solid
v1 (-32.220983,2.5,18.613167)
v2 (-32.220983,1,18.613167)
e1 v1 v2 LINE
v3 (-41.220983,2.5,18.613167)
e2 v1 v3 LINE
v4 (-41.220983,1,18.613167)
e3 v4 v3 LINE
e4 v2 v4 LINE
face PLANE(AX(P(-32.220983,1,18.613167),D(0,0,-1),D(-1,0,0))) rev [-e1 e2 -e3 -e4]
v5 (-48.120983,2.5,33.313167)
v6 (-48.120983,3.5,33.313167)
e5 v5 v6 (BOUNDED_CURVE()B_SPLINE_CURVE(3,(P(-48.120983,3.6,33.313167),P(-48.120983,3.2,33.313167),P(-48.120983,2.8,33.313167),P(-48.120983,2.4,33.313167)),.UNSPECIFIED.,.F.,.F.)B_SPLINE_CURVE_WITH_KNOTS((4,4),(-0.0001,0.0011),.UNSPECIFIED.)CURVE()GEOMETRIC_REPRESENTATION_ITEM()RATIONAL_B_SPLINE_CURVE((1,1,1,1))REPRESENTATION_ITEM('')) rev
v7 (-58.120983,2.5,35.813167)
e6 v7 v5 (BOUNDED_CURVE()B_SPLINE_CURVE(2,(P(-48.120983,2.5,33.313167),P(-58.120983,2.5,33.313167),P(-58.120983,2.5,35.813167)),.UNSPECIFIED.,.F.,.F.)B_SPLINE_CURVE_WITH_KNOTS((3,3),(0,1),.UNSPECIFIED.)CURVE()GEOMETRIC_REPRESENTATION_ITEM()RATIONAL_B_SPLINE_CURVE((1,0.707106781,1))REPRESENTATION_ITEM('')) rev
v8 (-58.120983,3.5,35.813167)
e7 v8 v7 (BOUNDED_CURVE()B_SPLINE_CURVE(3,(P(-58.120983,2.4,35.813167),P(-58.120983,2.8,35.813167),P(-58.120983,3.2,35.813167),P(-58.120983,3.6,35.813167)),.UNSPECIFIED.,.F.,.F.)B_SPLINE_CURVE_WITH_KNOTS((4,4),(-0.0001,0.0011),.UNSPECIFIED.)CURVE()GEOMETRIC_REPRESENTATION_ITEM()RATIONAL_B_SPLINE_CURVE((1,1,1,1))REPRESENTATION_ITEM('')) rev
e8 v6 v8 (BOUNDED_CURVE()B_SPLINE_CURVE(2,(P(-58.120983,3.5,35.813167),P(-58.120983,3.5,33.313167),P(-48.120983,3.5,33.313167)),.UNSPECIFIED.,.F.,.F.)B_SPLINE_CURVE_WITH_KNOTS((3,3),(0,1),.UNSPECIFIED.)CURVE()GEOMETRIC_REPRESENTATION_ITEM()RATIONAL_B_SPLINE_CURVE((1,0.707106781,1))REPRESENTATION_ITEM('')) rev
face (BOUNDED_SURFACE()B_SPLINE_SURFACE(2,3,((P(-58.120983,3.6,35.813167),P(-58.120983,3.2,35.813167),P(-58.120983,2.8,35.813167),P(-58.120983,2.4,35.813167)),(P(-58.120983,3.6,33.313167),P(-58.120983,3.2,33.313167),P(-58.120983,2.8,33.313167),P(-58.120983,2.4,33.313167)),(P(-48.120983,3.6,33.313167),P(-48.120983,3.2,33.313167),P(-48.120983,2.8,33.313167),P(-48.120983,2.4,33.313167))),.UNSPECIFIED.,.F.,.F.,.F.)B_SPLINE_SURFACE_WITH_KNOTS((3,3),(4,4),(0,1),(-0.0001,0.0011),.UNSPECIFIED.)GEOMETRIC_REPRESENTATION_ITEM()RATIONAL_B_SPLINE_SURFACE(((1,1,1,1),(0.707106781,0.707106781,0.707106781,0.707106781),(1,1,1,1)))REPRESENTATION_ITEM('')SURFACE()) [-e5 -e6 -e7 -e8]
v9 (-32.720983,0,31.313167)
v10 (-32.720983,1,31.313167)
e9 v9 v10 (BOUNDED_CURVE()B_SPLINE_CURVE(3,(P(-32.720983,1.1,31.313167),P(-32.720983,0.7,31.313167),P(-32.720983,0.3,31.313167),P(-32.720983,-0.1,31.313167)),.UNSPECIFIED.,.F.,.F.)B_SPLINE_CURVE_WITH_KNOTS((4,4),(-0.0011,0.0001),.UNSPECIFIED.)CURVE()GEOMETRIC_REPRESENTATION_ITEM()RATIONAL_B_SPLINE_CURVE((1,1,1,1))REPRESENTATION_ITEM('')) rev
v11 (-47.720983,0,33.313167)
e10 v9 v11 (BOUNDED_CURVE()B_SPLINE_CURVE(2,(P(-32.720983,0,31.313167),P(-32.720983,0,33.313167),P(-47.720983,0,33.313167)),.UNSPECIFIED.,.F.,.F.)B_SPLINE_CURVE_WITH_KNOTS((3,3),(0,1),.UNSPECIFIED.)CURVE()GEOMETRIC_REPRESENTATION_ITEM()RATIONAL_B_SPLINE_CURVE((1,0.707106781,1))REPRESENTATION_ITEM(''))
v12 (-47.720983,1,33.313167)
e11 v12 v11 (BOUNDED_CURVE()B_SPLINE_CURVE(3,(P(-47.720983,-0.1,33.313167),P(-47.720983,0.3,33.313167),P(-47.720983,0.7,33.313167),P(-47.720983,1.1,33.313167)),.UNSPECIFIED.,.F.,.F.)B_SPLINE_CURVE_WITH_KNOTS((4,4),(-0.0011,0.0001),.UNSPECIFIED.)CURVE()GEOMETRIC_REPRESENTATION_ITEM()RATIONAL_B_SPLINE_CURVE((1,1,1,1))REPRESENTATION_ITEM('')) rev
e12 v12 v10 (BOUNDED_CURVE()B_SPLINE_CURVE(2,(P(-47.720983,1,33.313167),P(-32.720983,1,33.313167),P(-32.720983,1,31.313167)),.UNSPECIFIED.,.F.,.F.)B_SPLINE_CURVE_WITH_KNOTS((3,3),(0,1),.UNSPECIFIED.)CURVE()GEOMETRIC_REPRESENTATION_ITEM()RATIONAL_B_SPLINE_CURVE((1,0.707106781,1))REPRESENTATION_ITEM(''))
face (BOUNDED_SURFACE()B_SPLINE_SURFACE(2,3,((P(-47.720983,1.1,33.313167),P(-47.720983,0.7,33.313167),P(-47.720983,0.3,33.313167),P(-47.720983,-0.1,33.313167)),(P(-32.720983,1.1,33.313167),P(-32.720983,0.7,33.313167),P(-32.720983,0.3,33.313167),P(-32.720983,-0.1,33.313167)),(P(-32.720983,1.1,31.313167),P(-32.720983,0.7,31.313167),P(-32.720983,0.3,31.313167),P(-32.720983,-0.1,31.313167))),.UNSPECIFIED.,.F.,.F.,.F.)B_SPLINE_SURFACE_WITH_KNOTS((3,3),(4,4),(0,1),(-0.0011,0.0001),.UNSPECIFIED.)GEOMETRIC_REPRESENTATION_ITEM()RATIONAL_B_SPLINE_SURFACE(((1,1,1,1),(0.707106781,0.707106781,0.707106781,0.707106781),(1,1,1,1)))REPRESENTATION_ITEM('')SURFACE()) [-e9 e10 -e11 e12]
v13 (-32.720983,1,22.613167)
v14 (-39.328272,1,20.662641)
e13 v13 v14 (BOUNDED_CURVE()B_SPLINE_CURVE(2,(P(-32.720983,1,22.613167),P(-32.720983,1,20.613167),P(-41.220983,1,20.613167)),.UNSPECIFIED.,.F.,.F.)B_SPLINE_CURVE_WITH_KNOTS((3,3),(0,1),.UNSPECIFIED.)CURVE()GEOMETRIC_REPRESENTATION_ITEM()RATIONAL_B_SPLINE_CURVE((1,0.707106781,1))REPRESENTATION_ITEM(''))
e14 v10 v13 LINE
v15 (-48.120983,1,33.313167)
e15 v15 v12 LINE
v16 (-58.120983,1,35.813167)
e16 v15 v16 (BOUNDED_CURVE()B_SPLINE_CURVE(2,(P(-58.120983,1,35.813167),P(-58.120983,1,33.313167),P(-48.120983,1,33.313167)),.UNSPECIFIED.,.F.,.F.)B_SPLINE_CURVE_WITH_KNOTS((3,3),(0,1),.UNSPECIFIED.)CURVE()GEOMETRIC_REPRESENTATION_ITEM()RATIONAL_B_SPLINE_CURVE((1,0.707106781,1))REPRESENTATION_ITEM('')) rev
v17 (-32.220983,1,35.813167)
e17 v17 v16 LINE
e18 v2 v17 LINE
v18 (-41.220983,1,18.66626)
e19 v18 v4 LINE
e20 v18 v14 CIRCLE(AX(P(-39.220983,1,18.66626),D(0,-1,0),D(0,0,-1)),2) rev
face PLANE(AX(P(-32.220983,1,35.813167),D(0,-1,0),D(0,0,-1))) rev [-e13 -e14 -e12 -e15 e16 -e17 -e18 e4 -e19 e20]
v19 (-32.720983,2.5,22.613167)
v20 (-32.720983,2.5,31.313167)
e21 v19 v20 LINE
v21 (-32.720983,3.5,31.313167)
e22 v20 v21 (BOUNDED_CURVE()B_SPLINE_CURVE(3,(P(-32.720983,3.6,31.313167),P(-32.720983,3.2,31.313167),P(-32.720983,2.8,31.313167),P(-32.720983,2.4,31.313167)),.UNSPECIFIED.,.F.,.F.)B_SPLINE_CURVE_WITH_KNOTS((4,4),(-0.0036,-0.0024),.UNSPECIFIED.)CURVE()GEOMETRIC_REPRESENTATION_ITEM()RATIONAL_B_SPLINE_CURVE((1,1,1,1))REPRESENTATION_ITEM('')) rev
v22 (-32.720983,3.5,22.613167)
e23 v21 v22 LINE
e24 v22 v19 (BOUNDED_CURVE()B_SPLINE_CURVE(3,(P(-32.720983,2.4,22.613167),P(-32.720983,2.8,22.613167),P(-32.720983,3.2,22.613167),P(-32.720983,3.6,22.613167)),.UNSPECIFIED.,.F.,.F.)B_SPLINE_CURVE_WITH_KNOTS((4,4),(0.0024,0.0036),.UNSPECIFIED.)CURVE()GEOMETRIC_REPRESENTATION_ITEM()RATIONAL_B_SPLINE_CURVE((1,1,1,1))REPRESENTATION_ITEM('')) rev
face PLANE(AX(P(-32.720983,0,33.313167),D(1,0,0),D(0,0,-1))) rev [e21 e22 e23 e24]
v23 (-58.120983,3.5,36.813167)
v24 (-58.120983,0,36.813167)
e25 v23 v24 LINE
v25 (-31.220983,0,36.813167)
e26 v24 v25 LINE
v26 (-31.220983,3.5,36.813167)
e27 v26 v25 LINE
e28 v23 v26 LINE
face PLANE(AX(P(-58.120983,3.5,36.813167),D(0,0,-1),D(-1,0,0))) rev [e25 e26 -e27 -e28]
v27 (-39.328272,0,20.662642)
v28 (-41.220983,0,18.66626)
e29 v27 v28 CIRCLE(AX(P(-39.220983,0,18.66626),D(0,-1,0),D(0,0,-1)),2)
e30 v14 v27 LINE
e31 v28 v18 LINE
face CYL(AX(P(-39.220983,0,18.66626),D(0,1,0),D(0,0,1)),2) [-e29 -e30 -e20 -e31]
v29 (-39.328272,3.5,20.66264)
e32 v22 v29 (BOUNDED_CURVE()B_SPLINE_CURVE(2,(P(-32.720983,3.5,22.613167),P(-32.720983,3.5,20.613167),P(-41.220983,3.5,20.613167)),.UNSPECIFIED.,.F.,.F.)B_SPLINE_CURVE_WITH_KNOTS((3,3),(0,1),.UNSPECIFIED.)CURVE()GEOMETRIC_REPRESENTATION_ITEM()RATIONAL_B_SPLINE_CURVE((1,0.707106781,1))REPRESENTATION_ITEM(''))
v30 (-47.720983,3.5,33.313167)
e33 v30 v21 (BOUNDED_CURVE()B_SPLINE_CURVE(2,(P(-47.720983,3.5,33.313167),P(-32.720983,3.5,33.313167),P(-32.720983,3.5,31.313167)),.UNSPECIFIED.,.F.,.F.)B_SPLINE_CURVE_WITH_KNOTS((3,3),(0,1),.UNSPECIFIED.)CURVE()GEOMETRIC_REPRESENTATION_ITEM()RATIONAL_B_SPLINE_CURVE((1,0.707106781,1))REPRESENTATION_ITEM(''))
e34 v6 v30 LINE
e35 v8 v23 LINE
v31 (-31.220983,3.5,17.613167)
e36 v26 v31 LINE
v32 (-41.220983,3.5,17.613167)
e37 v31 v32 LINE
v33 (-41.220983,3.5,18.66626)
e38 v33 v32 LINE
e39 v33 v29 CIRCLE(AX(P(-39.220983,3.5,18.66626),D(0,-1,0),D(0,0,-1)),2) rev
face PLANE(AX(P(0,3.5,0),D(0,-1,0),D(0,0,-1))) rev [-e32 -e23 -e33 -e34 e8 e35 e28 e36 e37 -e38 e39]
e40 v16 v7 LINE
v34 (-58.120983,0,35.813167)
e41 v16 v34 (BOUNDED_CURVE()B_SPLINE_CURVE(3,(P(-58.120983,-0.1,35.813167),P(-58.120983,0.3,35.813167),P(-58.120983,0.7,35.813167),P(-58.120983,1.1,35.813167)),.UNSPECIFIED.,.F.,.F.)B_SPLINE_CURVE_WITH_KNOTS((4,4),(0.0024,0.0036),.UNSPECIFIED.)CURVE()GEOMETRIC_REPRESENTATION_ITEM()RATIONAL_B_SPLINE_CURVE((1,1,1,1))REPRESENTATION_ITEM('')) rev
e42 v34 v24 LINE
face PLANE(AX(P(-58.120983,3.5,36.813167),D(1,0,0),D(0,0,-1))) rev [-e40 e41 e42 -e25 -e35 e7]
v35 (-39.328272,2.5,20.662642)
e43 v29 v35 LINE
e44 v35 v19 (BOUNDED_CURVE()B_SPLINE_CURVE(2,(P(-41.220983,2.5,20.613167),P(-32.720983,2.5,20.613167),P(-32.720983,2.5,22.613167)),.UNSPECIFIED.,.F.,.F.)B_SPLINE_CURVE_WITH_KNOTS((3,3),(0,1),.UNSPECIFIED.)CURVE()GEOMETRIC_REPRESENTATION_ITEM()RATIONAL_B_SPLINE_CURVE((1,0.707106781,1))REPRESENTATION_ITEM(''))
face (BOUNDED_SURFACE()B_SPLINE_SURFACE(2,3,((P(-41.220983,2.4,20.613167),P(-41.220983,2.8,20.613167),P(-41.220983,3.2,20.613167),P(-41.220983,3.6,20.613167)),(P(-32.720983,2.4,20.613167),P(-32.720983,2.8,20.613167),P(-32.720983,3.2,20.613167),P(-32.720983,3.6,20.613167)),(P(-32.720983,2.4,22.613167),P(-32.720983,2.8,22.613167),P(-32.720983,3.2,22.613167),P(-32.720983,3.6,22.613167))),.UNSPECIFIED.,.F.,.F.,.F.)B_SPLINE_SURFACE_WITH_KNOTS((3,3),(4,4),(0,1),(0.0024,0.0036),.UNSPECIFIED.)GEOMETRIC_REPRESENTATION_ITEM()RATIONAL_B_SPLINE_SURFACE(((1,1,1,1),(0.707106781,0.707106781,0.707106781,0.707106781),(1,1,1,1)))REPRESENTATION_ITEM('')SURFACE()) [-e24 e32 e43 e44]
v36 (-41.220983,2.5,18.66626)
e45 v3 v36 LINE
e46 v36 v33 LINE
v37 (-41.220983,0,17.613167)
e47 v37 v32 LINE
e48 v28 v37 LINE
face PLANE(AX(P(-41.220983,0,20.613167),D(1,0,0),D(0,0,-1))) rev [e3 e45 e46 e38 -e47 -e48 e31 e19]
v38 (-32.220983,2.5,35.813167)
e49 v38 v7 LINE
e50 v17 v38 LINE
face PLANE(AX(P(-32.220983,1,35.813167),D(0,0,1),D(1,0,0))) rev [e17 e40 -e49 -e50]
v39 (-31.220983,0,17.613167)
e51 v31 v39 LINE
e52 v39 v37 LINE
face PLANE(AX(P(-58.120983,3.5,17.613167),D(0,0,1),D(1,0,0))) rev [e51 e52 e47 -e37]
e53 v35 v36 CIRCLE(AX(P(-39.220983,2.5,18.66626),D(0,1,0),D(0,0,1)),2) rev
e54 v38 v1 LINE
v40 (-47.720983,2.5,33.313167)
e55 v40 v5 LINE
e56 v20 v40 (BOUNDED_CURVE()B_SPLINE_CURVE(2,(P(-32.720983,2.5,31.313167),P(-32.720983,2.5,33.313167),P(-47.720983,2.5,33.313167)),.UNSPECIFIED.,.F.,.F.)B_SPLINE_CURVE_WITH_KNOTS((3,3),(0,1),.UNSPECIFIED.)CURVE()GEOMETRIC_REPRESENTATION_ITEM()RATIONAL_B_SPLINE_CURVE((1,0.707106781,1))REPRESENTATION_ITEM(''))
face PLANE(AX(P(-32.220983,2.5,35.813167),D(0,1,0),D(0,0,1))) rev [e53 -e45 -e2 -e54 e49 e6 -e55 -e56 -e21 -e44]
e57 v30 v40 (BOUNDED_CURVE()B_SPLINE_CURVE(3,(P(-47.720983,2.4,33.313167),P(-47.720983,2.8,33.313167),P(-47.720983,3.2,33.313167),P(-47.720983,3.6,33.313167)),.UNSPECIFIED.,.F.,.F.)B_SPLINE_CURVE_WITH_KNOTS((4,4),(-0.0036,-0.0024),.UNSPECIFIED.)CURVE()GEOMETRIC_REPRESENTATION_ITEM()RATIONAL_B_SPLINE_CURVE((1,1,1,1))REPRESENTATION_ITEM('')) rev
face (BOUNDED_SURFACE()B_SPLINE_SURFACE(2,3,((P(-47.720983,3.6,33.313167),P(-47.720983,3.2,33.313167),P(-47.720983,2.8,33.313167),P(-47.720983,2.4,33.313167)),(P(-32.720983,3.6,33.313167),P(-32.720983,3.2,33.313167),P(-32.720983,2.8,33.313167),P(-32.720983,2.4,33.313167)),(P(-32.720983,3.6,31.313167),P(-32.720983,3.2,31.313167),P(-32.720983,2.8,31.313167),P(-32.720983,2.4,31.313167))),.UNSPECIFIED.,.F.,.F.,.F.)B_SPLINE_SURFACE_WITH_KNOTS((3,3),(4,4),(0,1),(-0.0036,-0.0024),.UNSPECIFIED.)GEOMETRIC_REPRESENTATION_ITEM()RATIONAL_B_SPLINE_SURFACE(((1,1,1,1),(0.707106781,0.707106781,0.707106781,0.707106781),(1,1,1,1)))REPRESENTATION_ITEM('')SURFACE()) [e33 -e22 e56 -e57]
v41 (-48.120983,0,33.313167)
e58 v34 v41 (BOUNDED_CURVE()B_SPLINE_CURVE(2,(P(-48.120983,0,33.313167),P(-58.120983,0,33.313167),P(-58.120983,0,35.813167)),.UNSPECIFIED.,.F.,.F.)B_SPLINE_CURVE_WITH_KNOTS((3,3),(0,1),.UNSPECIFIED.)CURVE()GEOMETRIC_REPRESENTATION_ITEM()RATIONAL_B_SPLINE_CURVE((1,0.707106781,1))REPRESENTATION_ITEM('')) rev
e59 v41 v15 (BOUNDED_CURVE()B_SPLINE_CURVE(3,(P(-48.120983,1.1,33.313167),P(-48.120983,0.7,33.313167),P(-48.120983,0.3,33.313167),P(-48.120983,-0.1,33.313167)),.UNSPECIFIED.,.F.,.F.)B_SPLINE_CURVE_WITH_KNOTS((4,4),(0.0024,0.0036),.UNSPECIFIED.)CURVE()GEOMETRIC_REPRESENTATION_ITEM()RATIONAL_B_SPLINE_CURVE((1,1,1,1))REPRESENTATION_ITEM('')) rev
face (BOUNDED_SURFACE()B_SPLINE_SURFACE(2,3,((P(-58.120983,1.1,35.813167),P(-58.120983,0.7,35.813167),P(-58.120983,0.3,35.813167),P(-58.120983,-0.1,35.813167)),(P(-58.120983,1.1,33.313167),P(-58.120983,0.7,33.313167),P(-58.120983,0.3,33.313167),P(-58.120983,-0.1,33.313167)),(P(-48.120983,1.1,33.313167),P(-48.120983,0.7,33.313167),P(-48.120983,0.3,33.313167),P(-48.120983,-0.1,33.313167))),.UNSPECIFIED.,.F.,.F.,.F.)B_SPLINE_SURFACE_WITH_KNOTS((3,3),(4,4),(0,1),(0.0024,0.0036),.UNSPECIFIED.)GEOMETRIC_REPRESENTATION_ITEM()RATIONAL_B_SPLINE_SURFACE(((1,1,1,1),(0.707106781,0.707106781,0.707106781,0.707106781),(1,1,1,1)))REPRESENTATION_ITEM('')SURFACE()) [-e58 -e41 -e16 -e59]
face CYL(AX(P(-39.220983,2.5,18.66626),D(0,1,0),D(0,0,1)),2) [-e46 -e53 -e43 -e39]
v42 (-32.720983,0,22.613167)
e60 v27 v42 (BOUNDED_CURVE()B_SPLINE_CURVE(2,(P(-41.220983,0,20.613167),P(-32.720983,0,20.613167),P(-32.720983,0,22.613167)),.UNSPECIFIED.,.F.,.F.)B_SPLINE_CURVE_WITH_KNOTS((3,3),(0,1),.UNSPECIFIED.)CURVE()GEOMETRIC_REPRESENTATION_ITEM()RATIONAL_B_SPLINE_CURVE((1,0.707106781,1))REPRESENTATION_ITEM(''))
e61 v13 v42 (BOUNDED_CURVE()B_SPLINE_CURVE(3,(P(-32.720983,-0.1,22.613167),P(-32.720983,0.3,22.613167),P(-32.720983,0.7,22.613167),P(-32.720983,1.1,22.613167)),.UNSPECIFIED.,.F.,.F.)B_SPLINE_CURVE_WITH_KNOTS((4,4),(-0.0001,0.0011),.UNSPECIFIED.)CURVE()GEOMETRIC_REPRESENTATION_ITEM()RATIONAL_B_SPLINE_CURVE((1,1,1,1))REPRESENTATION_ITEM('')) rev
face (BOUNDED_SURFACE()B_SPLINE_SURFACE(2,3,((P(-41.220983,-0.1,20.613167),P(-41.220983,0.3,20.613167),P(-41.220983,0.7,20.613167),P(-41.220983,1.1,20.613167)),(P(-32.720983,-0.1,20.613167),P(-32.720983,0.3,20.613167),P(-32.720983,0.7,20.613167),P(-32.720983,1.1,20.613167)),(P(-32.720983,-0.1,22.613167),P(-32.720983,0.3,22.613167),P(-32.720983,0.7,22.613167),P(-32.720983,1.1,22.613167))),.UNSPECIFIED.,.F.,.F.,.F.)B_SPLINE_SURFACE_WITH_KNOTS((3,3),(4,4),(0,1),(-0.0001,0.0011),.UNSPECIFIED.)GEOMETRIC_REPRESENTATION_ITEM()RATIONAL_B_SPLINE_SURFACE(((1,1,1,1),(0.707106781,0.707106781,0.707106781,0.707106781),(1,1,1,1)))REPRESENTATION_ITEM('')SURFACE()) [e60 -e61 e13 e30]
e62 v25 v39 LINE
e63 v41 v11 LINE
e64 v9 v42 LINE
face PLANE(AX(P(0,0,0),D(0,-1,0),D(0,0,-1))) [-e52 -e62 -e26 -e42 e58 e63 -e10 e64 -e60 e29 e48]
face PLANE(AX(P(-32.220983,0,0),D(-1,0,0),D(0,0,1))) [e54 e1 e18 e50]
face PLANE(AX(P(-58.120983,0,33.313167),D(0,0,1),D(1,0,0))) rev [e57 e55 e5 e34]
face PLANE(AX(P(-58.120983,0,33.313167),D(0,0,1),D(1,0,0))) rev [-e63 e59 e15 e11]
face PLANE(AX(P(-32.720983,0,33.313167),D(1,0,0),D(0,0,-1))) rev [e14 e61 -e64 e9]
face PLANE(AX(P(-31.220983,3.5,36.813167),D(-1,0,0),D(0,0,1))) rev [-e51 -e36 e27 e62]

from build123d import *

# Parameters (mm, degrees)
SKETCH1_W           = 26.9
SKETCH1_H           = 19.2
BOSS_EXTRUDE1_DEPTH = 3.5
CUT_EXTRUDE3_DEPTH  = 3.5
SKETCH4_W           = 17.2
SKETCH4_H           = 1.5
CUT_EXTRUDE4_DEPTH  = 25.9
FILLET1_DEPTH       = 1
FILLET2_START       = 2.5
FILLET2_DEPTH       = 1
FILLET3_SIZE        = 8.5
FILLET3_SIZE_2      = 2
FILLET4_START       = 2.5
FILLET4_DEPTH       = 1
FILLET6_SIZE        = 10
FILLET6_SIZE_2      = 2.5
FILLET7_SIZE        = 2.5
FILLET7_SIZE_2      = 10
FILLET8_R           = 2
FILLET9_R           = 2


with BuildPart() as part:
    # Sketch1 → Boss-Extrude1 (new body)
    with BuildSketch(Plane(origin=(0, 0, 0), x_dir=(1, 0, 0), z_dir=(0, 1, 0))):
        with Locations((-44.670982611, -27.213166741)):
            Rectangle(SKETCH1_W, SKETCH1_H)
    extrude(amount=BOSS_EXTRUDE1_DEPTH)

    # Sketch2 → Cut-Extrude3 (cut)
    with BuildSketch(Plane(origin=(0, 3.5, 0), x_dir=(1, 0, 0), z_dir=(0, 1, 0))):
        Polygon((-58.120982611, -33.313166741), (-32.720982611, -33.313166741), (-32.720982611, -20.613166741), (-41.220982611, -20.613166741), (-41.220982611, -17.613166741), (-58.120982611, -17.613166741), align=None)
    extrude(amount=-CUT_EXTRUDE3_DEPTH, mode=Mode.SUBTRACT)

    # Sketch4 → Cut-Extrude4 (cut)
    with BuildSketch(Plane.ZY.offset(58.120982611)):
        with Locations((27.213166741, 1.75)):
            Rectangle(SKETCH4_W, SKETCH4_H)
    extrude(amount=-CUT_EXTRUDE4_DEPTH, mode=Mode.SUBTRACT)

    # Fillet1: read off the stored shape, not the designer's step
    # Fillet1 outline → Fillet1 (add)
    with BuildSketch(Plane(origin=(0, 0, 0), x_dir=(1, 0, 0), z_dir=(0, 1, 0))):
        with BuildLine():
            add(Edge.make_bspline(
                [(-47.720982611, -33.313166741), (-32.720982611, -33.313166741), (-32.720982611, -31.313166741)],
                knots=[0, 0, 0, 1, 1, 1], degree=2, weights=[1, 0.707106781, 1]))
            Line((-47.720982611, -33.313166741), (-32.720982611, -33.313166741))
            Line((-32.720982611, -33.313166741), (-32.720982611, -31.313166741))
        make_face()
    extrude(amount=FILLET1_DEPTH)

    # Fillet2: read off the stored shape, not the designer's step
    # Fillet2 outline → Fillet2 (add)
    with BuildSketch(Plane(origin=(0, 0, 0), x_dir=(1, 0, 0), z_dir=(0, 1, 0)).offset(FILLET2_START)):
        with BuildLine():
            add(Edge.make_bspline(
                [(-47.720982611, -33.313166741), (-32.720982611, -33.313166741), (-32.720982611, -31.313166741)],
                knots=[0, 0, 0, 1, 1, 1], degree=2, weights=[1, 0.707106781, 1]))
            Line((-47.720982611, -33.313166741), (-32.720982611, -33.313166741))
            Line((-32.720982611, -33.313166741), (-32.720982611, -31.313166741))
        make_face()
    extrude(amount=FILLET2_DEPTH)

    # Fillet3
    # a fillet whose section is not a circle: 8.5, 2 mm, written as the material it adds along each edge
    with BuildSketch(Plane(origin=(-32.720982611, 1, 20.613166741), x_dir=(-1, 0, 0), z_dir=(0, -1, 0))) as fillet3_piece_1:
        with BuildLine():
            Bezier((FILLET3_SIZE, 0), (0, 0), (0, -FILLET3_SIZE_2), weights=[1, 0.707106781, 1])
            Line((0, -FILLET3_SIZE_2), (0, 0))
            Line((0, 0), (FILLET3_SIZE, 0))
        make_face()
    extrude(amount=1)

    # Fillet4: read off the stored shape, not the designer's step
    # Fillet4 outline → Fillet4 (add)
    with BuildSketch(Plane(origin=(0, 0, 0), x_dir=(1, 0, 0), z_dir=(0, 1, 0)).offset(FILLET4_START)):
        with BuildLine():
            Line((-32.720982611, -20.613166741), (-41.220982611, -20.613166741))
            add(Edge.make_bspline(
                [(-41.220982611, -20.613166741), (-32.720982611, -20.613166741), (-32.720982611, -22.613166741)],
                knots=[0, 0, 0, 1, 1, 1], degree=2, weights=[1, 0.707106781, 1]))
            Line((-32.720982611, -22.613166741), (-32.720982611, -20.613166741))
        make_face()
    extrude(amount=FILLET4_DEPTH)

    # Fillet6
    # a fillet whose section is not a circle: 10, 2.5 mm, written as the material it takes off along each edge
    with BuildSketch(Plane(origin=(-58.120982611, 26, 33.313166741), x_dir=(1, 0, 0), z_dir=(0, -1, 0))) as fillet6_piece_1_section:
        with BuildLine():
            Bezier((FILLET6_SIZE, 0), (0, 0), (0, FILLET6_SIZE_2), weights=[1, 0.707106781, 1])
            Line((0, FILLET6_SIZE_2), (0, 0))
            Line((0, 0), (FILLET6_SIZE, 0))
        make_face()
    fillet6_piece_1 = extrude(amount=51, mode=Mode.PRIVATE)
    fillet6_piece_1 = split(fillet6_piece_1, bisect_by=Plane(origin=(-58.120982611, 2.5, 33.313166741), z_dir=(0, -1, 0)), keep=Keep.TOP, mode=Mode.PRIVATE)
    add(fillet6_piece_1, mode=Mode.SUBTRACT)

    # Fillet7
    # a fillet whose section is not a circle: 10, 2.5 mm, written as the material it takes off along each edge
    with BuildSketch(Plane(origin=(-58.120982611, 28.5, 33.313166741), x_dir=(0, 0, 1), z_dir=(0, -1, 0))) as fillet7_piece_1:
        with BuildLine():
            Bezier((FILLET7_SIZE, 0), (0, 0), (0, -FILLET7_SIZE_2), weights=[1, 0.707106781, 1])
            Line((0, -FILLET7_SIZE_2), (0, 0))
            Line((0, 0), (FILLET7_SIZE, 0))
        make_face()
    extrude(amount=51, mode=Mode.SUBTRACT)

    # Fillet8
    fillet8_edges = [part.edges().sort_by_distance(p)[0] for p in [
        (-41.220982611, 0.5, 20.613166741),
    ]]
    fillet(fillet8_edges, radius=FILLET8_R)

    # Fillet9
    fillet9_edges = [part.edges().sort_by_distance(p)[0] for p in [
        (-41.220982611, 3, 20.613166741),
    ]]
    fillet(fillet9_edges, radius=FILLET9_R)


solid = part.part
